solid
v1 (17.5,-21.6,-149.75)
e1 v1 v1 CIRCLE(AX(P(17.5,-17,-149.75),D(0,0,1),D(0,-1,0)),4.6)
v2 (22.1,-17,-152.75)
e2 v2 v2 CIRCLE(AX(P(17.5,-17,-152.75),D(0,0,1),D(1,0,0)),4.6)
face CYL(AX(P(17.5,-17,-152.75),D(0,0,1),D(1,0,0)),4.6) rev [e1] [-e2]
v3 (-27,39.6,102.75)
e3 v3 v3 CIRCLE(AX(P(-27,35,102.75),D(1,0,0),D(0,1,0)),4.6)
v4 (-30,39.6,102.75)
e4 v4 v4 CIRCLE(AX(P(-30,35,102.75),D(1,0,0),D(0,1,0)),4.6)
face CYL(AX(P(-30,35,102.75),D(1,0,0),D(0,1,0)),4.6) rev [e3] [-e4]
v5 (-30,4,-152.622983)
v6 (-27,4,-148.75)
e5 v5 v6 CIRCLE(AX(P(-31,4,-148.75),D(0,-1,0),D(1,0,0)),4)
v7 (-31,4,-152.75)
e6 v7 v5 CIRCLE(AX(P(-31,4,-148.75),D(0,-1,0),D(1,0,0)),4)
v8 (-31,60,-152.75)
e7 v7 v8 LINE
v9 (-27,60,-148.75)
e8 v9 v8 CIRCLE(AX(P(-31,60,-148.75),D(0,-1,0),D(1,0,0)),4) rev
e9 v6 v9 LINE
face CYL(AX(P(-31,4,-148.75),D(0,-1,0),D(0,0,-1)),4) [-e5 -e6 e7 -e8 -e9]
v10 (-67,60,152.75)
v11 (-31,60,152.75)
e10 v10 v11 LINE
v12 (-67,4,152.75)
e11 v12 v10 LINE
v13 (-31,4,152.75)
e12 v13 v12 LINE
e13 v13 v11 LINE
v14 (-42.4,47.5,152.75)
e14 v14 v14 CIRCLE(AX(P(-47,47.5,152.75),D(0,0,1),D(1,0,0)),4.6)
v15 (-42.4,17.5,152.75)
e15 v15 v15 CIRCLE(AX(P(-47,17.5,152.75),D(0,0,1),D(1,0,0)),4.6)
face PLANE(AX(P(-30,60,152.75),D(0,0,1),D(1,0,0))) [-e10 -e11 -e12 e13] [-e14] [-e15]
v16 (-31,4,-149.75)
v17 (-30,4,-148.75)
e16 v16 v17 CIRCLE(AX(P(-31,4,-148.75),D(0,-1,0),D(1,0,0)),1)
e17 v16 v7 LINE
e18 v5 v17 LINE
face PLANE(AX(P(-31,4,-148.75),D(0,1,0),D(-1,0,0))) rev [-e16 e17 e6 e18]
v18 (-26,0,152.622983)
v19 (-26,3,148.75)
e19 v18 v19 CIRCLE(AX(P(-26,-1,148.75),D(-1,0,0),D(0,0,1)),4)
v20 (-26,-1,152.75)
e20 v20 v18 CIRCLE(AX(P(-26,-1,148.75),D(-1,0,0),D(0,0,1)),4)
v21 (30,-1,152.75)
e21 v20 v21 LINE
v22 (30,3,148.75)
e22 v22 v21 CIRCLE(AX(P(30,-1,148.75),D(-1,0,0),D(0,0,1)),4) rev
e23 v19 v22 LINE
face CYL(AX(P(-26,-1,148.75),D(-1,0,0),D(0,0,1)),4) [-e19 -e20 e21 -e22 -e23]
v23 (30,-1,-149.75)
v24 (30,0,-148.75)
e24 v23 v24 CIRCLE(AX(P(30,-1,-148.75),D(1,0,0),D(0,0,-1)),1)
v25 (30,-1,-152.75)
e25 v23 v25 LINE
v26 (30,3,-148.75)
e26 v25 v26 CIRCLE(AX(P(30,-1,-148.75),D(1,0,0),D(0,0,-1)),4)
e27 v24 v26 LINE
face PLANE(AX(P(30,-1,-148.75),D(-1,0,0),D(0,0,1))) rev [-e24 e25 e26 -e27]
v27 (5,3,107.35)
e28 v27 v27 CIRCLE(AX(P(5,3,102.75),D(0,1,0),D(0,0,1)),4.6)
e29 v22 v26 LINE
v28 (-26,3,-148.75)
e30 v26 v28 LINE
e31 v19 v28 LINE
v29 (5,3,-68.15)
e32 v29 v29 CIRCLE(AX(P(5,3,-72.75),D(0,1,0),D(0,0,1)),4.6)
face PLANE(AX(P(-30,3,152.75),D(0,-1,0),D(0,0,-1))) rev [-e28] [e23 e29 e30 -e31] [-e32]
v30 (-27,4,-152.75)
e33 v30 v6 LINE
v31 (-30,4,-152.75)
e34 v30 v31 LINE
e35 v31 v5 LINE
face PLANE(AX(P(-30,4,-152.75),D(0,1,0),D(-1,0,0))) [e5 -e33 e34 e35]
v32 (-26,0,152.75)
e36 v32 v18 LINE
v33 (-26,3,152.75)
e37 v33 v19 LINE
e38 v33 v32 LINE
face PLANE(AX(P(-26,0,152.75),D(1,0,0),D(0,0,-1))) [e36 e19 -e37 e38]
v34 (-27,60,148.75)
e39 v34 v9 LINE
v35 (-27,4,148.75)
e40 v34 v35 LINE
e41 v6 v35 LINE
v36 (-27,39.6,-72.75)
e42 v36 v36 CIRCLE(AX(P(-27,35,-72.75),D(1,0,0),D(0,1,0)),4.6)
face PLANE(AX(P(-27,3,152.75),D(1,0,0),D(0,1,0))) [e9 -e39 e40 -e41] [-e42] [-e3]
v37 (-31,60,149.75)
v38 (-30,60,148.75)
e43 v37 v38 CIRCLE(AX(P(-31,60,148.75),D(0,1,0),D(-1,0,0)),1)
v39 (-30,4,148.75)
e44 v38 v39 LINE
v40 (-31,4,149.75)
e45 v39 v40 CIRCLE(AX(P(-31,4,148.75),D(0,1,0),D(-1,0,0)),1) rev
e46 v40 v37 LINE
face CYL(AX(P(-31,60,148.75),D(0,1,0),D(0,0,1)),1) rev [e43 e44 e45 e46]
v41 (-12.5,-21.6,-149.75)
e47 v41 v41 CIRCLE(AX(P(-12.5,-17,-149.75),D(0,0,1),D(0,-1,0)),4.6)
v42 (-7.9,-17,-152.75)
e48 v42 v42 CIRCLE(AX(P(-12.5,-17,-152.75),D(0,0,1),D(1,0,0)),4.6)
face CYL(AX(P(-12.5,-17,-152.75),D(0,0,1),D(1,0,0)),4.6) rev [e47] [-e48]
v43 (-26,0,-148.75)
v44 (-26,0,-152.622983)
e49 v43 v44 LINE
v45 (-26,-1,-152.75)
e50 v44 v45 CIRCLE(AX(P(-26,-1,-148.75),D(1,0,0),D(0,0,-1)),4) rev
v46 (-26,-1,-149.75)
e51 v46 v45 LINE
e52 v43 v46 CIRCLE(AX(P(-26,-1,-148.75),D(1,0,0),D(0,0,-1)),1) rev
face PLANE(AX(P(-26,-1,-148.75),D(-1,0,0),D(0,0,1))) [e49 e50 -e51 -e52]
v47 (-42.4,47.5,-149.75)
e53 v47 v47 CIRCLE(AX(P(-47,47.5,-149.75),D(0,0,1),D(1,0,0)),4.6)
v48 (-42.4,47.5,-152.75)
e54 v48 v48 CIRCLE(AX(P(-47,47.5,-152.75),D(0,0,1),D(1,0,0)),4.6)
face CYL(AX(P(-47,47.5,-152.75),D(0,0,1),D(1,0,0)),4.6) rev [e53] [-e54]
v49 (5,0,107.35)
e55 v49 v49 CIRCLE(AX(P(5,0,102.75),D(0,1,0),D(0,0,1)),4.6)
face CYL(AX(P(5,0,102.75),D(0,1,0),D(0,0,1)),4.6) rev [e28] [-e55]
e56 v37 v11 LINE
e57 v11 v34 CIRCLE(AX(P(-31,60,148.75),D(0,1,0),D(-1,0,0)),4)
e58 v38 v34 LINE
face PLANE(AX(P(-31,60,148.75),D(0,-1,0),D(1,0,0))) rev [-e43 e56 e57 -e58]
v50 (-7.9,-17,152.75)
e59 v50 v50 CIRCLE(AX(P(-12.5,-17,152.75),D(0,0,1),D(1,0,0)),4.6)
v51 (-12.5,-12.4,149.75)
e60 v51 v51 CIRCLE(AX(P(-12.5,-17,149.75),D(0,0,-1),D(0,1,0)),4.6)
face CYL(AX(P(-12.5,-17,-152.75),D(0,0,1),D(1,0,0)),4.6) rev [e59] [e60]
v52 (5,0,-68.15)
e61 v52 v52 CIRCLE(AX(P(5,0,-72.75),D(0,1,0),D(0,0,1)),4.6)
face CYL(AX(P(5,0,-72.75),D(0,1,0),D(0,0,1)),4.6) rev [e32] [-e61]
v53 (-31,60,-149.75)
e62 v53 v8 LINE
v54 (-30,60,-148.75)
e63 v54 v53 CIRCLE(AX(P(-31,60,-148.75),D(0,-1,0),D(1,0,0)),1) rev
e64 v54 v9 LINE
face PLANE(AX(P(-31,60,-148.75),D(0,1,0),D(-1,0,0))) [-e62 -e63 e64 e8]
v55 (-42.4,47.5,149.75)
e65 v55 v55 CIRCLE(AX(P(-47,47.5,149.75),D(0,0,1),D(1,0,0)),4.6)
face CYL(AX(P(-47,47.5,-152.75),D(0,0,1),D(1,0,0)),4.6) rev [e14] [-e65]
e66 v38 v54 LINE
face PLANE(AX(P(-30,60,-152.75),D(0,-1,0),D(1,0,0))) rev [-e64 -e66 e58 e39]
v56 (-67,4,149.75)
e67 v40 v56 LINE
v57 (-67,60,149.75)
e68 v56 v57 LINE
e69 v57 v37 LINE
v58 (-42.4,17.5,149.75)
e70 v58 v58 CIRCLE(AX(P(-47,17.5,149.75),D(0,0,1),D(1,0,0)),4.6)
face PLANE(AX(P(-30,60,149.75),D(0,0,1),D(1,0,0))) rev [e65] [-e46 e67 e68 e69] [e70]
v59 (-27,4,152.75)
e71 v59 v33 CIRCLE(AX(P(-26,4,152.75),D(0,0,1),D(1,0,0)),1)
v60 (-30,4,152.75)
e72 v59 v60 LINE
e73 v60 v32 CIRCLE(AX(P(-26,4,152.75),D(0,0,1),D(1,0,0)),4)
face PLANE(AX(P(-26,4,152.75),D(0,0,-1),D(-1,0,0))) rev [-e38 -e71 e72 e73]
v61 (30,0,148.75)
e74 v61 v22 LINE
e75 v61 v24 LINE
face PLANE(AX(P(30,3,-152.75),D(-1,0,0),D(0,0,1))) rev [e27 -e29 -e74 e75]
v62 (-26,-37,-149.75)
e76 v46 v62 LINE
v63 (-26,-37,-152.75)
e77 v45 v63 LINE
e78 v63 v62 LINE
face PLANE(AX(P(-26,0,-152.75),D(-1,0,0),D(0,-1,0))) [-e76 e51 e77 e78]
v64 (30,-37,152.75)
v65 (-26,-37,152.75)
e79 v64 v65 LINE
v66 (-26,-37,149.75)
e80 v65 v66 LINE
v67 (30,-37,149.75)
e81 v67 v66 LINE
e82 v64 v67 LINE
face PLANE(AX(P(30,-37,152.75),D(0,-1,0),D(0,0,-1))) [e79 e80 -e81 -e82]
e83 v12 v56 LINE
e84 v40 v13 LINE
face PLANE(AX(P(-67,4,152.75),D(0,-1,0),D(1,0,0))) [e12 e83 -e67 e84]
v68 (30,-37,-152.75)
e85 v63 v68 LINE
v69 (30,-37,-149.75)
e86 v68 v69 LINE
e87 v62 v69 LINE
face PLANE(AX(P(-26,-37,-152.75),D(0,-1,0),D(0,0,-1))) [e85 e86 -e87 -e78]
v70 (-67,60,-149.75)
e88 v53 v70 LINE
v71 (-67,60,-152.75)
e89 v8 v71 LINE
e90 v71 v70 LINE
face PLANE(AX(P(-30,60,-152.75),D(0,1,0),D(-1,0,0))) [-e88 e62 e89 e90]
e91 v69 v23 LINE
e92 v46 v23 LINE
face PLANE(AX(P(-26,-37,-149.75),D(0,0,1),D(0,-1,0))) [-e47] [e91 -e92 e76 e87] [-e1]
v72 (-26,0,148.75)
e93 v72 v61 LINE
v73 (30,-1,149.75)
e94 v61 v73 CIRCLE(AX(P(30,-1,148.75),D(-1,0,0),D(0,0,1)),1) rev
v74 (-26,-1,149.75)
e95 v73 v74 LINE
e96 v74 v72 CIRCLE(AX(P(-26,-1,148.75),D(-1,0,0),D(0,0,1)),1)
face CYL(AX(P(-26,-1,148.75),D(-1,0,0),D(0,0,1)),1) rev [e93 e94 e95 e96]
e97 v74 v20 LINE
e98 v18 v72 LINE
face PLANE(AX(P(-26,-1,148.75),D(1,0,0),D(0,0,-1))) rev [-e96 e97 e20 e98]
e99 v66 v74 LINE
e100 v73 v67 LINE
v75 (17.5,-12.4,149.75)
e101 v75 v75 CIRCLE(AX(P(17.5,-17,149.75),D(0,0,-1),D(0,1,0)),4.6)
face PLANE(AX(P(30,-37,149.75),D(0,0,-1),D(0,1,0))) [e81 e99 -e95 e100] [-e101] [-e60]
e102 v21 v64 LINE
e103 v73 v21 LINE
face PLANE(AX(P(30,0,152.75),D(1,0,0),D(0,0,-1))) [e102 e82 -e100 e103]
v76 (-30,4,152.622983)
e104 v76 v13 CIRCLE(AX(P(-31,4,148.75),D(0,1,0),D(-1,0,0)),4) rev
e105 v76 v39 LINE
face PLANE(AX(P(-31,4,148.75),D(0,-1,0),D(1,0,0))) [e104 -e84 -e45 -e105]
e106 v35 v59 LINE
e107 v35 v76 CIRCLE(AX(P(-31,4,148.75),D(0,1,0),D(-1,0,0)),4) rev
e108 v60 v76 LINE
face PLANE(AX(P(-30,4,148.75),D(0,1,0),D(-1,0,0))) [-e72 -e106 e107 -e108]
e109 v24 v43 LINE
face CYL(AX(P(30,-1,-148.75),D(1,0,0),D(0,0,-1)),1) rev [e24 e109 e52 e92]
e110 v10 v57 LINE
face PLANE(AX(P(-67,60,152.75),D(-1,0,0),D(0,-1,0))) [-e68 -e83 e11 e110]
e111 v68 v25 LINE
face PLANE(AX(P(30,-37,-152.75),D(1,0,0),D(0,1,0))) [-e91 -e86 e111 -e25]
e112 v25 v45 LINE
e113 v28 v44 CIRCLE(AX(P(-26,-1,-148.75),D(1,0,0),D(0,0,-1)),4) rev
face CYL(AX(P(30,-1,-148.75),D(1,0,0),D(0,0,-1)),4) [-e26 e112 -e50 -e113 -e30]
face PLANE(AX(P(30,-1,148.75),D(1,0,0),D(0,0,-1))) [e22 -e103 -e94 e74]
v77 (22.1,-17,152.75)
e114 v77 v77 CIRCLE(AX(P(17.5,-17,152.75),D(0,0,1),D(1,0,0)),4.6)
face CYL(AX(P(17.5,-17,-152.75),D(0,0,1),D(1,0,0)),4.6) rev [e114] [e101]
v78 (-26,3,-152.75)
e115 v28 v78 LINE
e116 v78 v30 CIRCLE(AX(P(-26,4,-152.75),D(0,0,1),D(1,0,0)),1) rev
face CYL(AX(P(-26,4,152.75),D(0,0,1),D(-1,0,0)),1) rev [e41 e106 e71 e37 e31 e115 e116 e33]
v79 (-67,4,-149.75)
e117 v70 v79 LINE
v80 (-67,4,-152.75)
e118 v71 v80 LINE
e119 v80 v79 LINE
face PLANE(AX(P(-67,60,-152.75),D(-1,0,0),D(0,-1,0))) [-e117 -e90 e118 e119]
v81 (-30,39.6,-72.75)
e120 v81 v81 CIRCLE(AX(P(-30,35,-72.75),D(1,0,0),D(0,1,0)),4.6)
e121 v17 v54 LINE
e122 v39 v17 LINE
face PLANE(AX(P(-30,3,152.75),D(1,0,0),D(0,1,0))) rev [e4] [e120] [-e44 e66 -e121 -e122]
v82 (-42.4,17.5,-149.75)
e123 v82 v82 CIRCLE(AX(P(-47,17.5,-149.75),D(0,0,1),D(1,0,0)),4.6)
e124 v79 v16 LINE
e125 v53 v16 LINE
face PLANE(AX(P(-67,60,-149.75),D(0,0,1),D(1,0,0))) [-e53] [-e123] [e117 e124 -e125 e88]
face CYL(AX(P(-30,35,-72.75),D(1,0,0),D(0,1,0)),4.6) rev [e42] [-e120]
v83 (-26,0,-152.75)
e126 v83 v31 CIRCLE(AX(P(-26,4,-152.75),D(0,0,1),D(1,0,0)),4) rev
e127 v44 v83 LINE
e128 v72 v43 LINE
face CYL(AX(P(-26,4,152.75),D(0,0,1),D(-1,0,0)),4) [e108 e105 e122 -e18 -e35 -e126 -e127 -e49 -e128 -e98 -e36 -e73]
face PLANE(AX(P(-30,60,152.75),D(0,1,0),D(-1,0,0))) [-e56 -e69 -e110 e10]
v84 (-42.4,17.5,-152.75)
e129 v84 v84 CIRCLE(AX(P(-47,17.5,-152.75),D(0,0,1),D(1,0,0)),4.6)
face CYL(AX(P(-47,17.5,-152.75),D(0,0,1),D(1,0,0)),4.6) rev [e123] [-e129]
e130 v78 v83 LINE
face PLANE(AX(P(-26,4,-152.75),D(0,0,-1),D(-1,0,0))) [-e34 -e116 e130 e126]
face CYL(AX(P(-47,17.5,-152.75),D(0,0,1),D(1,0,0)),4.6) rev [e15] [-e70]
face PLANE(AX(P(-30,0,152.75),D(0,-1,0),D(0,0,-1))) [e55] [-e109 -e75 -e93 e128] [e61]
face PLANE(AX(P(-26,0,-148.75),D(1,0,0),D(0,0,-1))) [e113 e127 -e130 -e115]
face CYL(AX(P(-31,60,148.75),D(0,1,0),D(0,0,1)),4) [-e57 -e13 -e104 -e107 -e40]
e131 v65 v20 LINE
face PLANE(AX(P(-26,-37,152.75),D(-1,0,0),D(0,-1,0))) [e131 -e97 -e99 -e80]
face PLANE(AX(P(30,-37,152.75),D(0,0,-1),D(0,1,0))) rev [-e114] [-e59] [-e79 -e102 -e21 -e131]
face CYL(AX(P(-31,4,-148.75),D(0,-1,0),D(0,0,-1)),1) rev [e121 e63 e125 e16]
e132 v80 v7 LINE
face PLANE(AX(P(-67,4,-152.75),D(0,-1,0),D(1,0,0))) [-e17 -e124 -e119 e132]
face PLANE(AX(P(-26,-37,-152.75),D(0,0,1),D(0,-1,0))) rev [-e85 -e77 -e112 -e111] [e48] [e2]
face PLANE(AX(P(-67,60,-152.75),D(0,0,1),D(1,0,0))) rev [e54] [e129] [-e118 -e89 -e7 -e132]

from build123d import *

# Parameters (mm, degrees)
SKETCH1_W                      = 60
SKETCH1_H                      = 305.5
BASE_FLANGE1_DEPTH             = 3
EDGE_FLANGE1_STRIP_W           = 14
EDGE_FLANGE1_STRIP_H           = 3
EDGE_FLANGE1_STRIP_CUT_DEPTH   = 305.5
EDGE_FLANGE1_DEPTH             = 305.5
EDGE_FLANGE2_STRIP_W           = 14
EDGE_FLANGE2_STRIP_H           = 3
EDGE_FLANGE2_STRIP_CUT_DEPTH   = 56
EDGE_FLANGE2_STRIP_2_W         = 14
EDGE_FLANGE2_STRIP_2_H         = 3
EDGE_FLANGE2_STRIP_CUT_2_DEPTH = 56
EDGE_FLANGE2_STRIP_3_W         = 14
EDGE_FLANGE2_STRIP_3_H         = 3
EDGE_FLANGE2_STRIP_CUT_3_DEPTH = 56
EDGE_FLANGE2_STRIP_4_W         = 14
EDGE_FLANGE2_STRIP_4_H         = 3
EDGE_FLANGE2_STRIP_CUT_4_DEPTH = 56
EDGE_FLANGE2_DEPTH             = 56
EDGE_FLANGE2_BEND_DEPTH        = 56
EDGE_FLANGE2_BEND_2_DEPTH      = 56
EDGE_FLANGE2_BEND_3_DEPTH      = 56
SKETCH18_R                     = 4.6
EXTRUDE1_DEPTH                 = 319.463891203
SKETCH19_R                     = 4.6
EXTRUDE2_DEPTH                 = 3
SKETCH20_R                     = 4.6
EXTRUDE3_DEPTH                 = 3


# Sheet-metal steps are written as plain solids
with BuildPart() as part:
    # Sketch1 → Base-Flange1 (new body)
    with BuildSketch(Plane(origin=(0, 0, 0), x_dir=(1, 0, 0), z_dir=(0, 1, 0))):
        Rectangle(SKETCH1_W, SKETCH1_H)
    extrude(amount=BASE_FLANGE1_DEPTH)

    # Edge-Flange1 strip (across the edge) → Edge-Flange1 strip cut (cut)
    with BuildSketch(Plane(origin=(-30, 3, -152.75), x_dir=(1, 0, 0), z_dir=(0, 0, 1))):
        with Locations((-3, -1.5)):
            Rectangle(EDGE_FLANGE1_STRIP_W, EDGE_FLANGE1_STRIP_H)
    extrude(amount=EDGE_FLANGE1_STRIP_CUT_DEPTH, mode=Mode.SUBTRACT)

    # Edge-Flange1 section (across the edge) → Edge-Flange1 (add)
    with BuildSketch(Plane(origin=(-30, 3, -152.75), x_dir=(1, 0, 0), z_dir=(0, 0, 1))):
        with BuildLine():
            Line((0, 1), (0, 57))
            Line((0, 57), (3, 57))
            Line((3, 57), (3, 1))
            ThreePointArc((3, 1), (3.292893219, 0.292893219), (4, 0))
            Line((4, 0), (4, -3))
            ThreePointArc((4, -3), (1.171572875, -1.828427125), (0, 1))
        make_face()
    extrude(amount=EDGE_FLANGE1_DEPTH)

    # Edge-Flange2 strip (across the edge) → Edge-Flange2 strip cut (cut)
    with BuildSketch(Plane(origin=(-30, 4, 152.75), x_dir=(0, 0, -1), z_dir=(0, 1, 0))):
        with Locations((-3, -1.5)):
            Rectangle(EDGE_FLANGE2_STRIP_W, EDGE_FLANGE2_STRIP_H)
    extrude(amount=EDGE_FLANGE2_STRIP_CUT_DEPTH, mode=Mode.SUBTRACT)

    # Edge-Flange2 strip 2 (across the edge) → Edge-Flange2 strip cut 2 (cut)
    with BuildSketch(Plane(origin=(30, 0, 152.75), x_dir=(0, 0, -1), z_dir=(-1, 0, 0))):
        with Locations((-3, -1.5)):
            Rectangle(EDGE_FLANGE2_STRIP_2_W, EDGE_FLANGE2_STRIP_2_H)
    extrude(amount=EDGE_FLANGE2_STRIP_CUT_2_DEPTH, mode=Mode.SUBTRACT)

    # Edge-Flange2 strip 3 (across the edge) → Edge-Flange2 strip cut 3 (cut)
    with BuildSketch(Plane(origin=(-30, 60, -152.75), x_dir=(0, 0, 1), z_dir=(0, -1, 0))):
        with Locations((-3, -1.5)):
            Rectangle(EDGE_FLANGE2_STRIP_3_W, EDGE_FLANGE2_STRIP_3_H)
    extrude(amount=EDGE_FLANGE2_STRIP_CUT_3_DEPTH, mode=Mode.SUBTRACT)

    # Edge-Flange2 strip 4 (across the edge) → Edge-Flange2 strip cut 4 (cut)
    with BuildSketch(Plane(origin=(-26, 0, -152.75), x_dir=(0, 0, 1), z_dir=(1, 0, 0))):
        with Locations((-3, -1.5)):
            Rectangle(EDGE_FLANGE2_STRIP_4_W, EDGE_FLANGE2_STRIP_4_H)
    extrude(amount=EDGE_FLANGE2_STRIP_CUT_4_DEPTH, mode=Mode.SUBTRACT)

    # Edge-Flange2 section (across the edge) → Edge-Flange2 (add)
    with BuildSketch(Plane(origin=(-30, 4, 152.75), x_dir=(0, 0, -1), z_dir=(0, 1, 0))):
        with BuildLine():
            Line((0, 1), (0, 37))
            Line((0, 37), (3, 37))
            Line((3, 37), (3, 1))
            ThreePointArc((3, 1), (3.292893219, 0.292893219), (4, 0))
            Line((4, 0), (4, -3))
            ThreePointArc((4, -3), (1.171572875, -1.828427125), (0, 1))
        make_face()
    extrude(amount=EDGE_FLANGE2_DEPTH)

    # Edge-Flange2 section 2 (across the edge) → Edge-Flange2 bend (add)
    with BuildSketch(Plane(origin=(30, 0, 152.75), x_dir=(0, 0, -1), z_dir=(-1, 0, 0))):
        with BuildLine():
            Line((0, 1), (0, 37))
            Line((0, 37), (3, 37))
            Line((3, 37), (3, 1))
            ThreePointArc((3, 1), (3.292893219, 0.292893219), (4, 0))
            Line((4, 0), (4, -3))
            ThreePointArc((4, -3), (1.171572875, -1.828427125), (0, 1))
        make_face()
    extrude(amount=EDGE_FLANGE2_BEND_DEPTH)

    # Edge-Flange2 section 3 (across the edge) → Edge-Flange2 bend 2 (add)
    with BuildSketch(Plane(origin=(-30, 60, -152.75), x_dir=(0, 0, 1), z_dir=(0, -1, 0))):
        with BuildLine():
            Line((0, 1), (0, 37))
            Line((0, 37), (3, 37))
            Line((3, 37), (3, 1))
            ThreePointArc((3, 1), (3.292893219, 0.292893219), (4, 0))
            Line((4, 0), (4, -3))
            ThreePointArc((4, -3), (1.171572875, -1.828427125), (0, 1))
        make_face()
    extrude(amount=EDGE_FLANGE2_BEND_2_DEPTH)

    # Edge-Flange2 section 4 (across the edge) → Edge-Flange2 bend 3 (add)
    with BuildSketch(Plane(origin=(-26, 0, -152.75), x_dir=(0, 0, 1), z_dir=(1, 0, 0))):
        with BuildLine():
            Line((0, 1), (0, 37))
            Line((0, 37), (3, 37))
            Line((3, 37), (3, 1))
            ThreePointArc((3, 1), (3.292893219, 0.292893219), (4, 0))
            Line((4, 0), (4, -3))
            ThreePointArc((4, -3), (1.171572875, -1.828427125), (0, 1))
        make_face()
    extrude(amount=EDGE_FLANGE2_BEND_3_DEPTH)

    # Sketch18 → Extrude1 (cut, through all)
    with BuildSketch(Plane.XY.offset(152.75)):
        with Locations((-47, 47.5)):
            Circle(SKETCH18_R)
        with Locations((-47, 17.5)):
            Circle(SKETCH18_R)
        with Locations((-12.5, -17)):
            Circle(SKETCH18_R)
        with Locations((17.5, -17)):
            Circle(SKETCH18_R)
    extrude(amount=-EXTRUDE1_DEPTH, mode=Mode.SUBTRACT)

    # Sketch19 → Extrude2 (cut)
    with BuildSketch(Plane(origin=(-27, 0, 0), x_dir=(0, 0, -1), z_dir=(1, 0, 0))):
        with Locations(Location((-102.75, 35, 0), (0, 0, 90))):
            Circle(SKETCH19_R)
        with Locations(Location((72.75, 35, 0), (0, 0, 90))):
            Circle(SKETCH19_R)
    extrude(amount=-EXTRUDE2_DEPTH, mode=Mode.SUBTRACT)

    # Sketch20 → Extrude3 (cut)
    with BuildSketch(Plane(origin=(0, 3, 0), x_dir=(1, 0, 0), z_dir=(0, 1, 0))):
        with Locations(Location((5, 72.75, 0), (0, 0, 270))):
            Circle(SKETCH20_R)
        with Locations(Location((5, -102.75, 0), (0, 0, 270))):
            Circle(SKETCH20_R)
    extrude(amount=-EXTRUDE3_DEPTH, mode=Mode.SUBTRACT)


solid = part.part
